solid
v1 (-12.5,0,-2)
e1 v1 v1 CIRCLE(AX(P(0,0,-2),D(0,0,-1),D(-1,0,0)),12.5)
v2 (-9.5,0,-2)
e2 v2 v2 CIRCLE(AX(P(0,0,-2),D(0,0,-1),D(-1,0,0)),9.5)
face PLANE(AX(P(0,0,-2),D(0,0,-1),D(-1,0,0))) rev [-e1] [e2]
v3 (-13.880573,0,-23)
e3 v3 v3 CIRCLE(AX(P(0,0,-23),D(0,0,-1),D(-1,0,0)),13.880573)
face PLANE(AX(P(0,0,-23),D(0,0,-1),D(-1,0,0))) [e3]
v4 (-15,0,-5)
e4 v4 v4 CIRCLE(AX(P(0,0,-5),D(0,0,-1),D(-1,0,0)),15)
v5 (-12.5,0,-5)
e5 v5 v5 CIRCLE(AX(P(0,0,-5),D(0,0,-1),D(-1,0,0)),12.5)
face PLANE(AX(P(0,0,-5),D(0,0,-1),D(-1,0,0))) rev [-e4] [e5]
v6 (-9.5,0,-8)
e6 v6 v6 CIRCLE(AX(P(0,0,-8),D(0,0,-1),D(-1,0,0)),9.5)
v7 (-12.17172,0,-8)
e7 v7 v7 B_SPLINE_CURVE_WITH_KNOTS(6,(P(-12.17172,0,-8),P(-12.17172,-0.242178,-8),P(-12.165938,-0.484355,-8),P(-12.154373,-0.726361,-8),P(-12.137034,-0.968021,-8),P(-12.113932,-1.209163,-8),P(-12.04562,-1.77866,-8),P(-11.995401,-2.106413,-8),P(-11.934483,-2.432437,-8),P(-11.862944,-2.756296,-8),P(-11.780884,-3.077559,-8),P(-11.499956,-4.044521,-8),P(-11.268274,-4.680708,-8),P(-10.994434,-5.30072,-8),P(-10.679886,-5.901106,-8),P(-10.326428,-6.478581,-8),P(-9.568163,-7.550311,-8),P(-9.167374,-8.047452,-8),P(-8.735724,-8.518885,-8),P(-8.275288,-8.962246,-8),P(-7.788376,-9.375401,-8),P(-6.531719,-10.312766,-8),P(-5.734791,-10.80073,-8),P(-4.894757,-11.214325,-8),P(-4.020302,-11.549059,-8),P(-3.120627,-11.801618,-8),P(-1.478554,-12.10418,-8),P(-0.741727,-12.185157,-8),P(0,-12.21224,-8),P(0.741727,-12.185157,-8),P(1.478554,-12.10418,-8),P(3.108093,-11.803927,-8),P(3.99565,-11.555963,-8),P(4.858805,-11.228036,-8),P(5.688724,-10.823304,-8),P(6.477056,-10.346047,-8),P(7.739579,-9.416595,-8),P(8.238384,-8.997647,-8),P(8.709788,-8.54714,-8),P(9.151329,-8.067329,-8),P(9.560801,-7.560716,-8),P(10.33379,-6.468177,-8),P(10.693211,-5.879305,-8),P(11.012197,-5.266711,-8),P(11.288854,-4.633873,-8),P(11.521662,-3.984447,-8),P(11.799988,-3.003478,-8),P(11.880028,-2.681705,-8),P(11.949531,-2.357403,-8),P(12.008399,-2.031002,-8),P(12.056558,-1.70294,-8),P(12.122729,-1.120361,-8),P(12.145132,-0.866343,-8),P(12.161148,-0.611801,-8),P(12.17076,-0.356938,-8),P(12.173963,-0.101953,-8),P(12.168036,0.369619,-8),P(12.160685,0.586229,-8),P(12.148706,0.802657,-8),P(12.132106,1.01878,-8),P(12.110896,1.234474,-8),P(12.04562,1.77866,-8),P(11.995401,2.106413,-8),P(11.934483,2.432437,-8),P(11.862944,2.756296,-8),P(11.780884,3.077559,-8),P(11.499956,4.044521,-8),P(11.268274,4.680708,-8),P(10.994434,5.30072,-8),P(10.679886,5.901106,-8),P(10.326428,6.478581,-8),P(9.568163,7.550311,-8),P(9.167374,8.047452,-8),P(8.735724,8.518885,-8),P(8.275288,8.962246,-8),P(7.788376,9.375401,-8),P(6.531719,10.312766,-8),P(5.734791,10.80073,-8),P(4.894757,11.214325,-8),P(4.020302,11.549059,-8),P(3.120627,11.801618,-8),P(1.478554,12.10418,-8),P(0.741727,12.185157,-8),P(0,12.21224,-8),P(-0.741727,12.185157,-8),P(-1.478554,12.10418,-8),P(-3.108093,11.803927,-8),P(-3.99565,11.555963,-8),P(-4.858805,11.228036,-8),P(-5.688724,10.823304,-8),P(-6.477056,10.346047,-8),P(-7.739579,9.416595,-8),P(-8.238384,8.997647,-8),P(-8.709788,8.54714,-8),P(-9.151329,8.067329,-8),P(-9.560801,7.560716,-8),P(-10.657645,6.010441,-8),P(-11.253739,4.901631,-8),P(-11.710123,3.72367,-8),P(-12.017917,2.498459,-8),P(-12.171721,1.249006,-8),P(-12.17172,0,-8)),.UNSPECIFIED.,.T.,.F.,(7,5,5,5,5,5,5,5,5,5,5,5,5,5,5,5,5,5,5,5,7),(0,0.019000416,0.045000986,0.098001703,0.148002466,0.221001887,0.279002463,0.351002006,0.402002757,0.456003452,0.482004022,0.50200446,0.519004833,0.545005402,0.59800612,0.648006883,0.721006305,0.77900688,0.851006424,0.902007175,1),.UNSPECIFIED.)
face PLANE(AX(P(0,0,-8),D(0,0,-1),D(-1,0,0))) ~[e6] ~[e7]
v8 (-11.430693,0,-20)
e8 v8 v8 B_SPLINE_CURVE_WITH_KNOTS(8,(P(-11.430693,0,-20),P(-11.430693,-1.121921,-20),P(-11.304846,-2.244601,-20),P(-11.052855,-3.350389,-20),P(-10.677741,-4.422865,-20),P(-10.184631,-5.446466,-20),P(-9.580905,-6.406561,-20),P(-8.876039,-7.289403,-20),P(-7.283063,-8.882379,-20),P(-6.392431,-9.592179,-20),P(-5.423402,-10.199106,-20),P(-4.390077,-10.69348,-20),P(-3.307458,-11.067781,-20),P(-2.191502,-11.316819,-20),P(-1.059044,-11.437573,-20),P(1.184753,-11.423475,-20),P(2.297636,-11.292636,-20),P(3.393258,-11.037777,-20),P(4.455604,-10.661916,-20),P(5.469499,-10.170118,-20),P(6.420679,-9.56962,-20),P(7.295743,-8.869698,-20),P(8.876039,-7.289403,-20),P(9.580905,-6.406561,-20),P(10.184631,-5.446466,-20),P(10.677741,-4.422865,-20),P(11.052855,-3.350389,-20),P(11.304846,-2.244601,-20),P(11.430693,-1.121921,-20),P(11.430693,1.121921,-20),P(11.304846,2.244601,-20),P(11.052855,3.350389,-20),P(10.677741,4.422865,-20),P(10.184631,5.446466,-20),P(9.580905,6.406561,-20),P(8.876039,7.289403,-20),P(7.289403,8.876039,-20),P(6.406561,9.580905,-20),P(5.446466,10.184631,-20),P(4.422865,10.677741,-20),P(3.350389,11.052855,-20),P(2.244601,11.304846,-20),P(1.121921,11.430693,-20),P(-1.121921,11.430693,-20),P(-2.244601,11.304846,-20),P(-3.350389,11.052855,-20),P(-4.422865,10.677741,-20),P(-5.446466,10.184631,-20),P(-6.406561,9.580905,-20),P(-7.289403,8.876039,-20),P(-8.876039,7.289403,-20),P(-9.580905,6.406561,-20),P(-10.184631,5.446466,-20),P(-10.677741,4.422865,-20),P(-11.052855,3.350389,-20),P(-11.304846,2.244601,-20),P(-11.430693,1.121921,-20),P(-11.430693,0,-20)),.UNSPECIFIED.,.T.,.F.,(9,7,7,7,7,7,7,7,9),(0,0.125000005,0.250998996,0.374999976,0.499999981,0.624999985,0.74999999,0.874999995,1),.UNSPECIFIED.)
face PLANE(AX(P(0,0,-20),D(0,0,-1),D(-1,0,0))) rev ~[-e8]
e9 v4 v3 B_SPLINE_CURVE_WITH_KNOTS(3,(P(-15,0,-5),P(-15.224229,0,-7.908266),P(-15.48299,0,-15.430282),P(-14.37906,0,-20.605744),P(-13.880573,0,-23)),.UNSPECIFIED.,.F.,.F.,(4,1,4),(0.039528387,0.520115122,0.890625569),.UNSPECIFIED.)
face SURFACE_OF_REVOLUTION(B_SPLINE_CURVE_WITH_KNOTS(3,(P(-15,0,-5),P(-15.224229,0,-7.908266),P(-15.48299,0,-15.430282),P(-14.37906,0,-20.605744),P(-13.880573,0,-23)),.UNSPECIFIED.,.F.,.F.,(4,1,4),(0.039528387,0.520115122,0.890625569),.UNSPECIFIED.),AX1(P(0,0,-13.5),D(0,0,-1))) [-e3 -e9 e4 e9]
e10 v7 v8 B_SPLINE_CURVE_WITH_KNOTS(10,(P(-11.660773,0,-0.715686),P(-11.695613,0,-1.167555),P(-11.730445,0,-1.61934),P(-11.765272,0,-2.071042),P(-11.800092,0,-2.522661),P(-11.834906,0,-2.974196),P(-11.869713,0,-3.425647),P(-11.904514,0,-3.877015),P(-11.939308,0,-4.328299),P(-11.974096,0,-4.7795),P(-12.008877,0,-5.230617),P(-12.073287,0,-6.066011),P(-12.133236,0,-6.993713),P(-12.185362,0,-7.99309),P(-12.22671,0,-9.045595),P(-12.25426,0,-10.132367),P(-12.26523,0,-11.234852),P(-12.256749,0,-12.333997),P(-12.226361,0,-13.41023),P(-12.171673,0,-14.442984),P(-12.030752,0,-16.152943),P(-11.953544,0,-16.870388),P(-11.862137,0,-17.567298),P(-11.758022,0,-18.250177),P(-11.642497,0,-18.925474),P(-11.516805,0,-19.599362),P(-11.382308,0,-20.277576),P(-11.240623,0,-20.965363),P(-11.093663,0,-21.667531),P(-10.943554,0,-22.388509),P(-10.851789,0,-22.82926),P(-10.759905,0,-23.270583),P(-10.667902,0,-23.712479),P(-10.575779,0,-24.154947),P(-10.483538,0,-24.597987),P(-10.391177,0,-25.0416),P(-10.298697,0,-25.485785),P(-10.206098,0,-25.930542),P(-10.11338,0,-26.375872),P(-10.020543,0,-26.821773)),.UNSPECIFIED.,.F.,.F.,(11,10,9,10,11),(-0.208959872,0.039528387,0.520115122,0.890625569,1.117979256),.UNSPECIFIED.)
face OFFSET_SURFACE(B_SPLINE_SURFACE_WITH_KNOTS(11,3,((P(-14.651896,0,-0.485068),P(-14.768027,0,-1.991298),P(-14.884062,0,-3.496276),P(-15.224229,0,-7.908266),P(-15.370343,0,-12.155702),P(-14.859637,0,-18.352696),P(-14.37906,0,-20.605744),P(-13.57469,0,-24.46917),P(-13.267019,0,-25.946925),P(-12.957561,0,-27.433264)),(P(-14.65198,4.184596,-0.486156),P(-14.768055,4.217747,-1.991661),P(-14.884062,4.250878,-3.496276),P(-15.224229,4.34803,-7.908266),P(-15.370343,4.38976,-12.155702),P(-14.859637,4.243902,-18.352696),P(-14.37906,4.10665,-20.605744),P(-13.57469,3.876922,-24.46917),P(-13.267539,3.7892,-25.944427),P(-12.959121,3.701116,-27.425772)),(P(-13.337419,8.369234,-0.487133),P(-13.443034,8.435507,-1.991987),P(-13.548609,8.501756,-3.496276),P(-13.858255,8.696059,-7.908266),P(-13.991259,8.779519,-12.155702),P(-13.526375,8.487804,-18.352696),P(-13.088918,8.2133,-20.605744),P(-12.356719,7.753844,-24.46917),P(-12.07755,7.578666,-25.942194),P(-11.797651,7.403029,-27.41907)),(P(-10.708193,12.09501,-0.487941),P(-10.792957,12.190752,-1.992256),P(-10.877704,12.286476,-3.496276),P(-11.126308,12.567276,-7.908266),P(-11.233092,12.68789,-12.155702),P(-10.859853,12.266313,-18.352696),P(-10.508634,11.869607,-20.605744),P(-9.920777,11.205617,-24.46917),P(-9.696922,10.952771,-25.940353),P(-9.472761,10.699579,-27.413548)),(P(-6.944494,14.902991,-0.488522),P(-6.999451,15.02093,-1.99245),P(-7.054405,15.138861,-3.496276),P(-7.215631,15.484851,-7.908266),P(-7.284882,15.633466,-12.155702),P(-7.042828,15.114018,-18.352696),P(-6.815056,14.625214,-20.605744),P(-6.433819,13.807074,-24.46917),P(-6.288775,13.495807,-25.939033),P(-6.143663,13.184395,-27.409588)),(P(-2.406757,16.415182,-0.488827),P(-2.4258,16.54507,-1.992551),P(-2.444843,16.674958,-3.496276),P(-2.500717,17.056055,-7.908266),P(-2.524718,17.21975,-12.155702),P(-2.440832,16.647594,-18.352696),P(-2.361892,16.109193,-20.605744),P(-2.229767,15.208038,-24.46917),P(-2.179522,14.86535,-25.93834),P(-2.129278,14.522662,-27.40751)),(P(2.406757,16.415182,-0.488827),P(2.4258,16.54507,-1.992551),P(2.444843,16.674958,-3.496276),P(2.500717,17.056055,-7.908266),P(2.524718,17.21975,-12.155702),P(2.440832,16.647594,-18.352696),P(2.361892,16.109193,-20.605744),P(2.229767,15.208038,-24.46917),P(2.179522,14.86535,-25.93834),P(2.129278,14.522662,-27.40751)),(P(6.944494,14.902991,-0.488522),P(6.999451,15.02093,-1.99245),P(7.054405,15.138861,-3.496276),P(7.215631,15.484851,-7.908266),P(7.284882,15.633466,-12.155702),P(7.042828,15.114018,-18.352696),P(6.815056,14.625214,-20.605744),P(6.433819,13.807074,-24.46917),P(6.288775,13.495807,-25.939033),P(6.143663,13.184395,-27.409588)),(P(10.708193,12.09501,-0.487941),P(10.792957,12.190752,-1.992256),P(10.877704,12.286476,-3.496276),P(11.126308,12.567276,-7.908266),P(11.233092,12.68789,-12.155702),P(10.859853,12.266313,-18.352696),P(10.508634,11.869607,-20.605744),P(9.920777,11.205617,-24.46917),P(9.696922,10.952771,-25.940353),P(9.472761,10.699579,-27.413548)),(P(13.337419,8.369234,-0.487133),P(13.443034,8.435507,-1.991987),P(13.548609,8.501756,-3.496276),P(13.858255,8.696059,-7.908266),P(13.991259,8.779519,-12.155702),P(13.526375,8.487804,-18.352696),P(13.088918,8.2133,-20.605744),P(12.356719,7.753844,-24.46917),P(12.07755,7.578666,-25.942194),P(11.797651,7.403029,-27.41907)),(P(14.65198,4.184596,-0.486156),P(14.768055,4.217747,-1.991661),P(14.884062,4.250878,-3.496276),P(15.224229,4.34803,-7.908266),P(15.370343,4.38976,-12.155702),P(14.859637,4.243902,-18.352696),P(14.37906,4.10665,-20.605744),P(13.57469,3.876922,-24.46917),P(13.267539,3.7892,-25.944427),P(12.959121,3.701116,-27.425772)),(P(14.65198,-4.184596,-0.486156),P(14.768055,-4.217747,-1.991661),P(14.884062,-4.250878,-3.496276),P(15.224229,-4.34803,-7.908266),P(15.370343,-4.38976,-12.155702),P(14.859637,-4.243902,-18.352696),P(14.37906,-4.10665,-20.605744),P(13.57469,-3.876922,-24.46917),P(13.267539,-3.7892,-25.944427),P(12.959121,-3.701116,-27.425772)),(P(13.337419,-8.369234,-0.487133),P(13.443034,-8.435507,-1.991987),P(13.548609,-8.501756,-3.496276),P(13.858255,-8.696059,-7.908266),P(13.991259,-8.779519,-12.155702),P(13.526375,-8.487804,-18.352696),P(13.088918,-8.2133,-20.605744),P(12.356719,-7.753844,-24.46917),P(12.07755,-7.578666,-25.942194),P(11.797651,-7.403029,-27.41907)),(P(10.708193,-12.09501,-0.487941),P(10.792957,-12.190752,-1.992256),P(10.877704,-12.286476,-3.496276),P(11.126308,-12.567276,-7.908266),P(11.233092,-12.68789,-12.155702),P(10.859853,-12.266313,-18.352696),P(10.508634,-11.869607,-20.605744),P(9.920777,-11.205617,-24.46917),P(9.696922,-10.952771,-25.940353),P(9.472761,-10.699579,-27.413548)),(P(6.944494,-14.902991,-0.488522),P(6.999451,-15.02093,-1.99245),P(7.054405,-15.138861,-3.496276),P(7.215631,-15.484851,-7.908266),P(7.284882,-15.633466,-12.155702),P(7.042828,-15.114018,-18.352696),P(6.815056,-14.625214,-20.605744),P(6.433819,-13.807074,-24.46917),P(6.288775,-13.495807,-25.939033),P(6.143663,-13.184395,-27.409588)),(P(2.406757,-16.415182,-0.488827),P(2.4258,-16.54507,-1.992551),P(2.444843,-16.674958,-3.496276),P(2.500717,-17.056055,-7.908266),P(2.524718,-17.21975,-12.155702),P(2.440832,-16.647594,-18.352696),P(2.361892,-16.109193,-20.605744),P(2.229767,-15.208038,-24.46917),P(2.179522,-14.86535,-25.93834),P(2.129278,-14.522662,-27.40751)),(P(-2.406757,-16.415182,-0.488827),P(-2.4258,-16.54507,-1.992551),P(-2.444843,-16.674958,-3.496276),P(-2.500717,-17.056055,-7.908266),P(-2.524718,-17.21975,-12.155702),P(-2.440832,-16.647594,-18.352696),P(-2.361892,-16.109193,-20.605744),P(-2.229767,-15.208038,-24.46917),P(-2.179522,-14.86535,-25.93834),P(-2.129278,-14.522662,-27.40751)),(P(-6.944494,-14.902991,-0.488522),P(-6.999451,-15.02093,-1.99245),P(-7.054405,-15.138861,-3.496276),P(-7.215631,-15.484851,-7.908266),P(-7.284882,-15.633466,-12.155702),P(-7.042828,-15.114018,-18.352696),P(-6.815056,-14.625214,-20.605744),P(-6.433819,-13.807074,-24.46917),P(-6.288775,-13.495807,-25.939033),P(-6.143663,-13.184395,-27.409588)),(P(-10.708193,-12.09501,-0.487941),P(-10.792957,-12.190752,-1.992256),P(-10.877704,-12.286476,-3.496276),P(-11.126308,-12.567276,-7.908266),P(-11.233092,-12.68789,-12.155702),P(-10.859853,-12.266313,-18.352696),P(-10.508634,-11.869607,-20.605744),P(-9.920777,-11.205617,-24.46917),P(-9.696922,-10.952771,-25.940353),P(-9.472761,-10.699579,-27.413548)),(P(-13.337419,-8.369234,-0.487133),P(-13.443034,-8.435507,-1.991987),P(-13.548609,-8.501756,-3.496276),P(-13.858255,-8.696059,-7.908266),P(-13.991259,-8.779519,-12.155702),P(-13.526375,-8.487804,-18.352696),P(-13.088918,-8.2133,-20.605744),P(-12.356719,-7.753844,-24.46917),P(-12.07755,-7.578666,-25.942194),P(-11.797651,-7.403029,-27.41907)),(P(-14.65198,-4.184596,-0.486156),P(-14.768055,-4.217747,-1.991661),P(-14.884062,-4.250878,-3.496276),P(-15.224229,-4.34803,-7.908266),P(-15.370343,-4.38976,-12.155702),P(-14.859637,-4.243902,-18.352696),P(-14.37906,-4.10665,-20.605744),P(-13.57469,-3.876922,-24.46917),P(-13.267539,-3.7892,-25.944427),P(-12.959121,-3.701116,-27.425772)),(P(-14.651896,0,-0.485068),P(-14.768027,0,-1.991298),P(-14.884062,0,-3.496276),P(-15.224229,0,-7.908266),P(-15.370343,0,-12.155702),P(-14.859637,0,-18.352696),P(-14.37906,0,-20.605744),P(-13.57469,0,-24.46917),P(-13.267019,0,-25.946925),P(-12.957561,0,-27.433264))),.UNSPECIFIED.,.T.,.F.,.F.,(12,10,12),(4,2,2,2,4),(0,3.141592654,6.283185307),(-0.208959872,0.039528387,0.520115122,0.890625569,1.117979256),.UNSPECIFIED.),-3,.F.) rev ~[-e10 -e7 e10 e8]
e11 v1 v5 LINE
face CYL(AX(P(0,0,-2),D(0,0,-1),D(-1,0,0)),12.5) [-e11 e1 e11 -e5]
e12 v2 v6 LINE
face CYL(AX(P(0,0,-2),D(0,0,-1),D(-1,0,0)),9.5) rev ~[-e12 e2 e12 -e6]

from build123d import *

# Parameters (mm, degrees)
F3_T = -3


# Not quite as in the source:
# - a feature of the source that left no trace in its solid (it failed there, or was rolled back) is left out


with BuildPart() as f2:
    # F1 (on face) → F2 (revolve)
    with BuildSketch(Plane.XZ):
        with BuildLine():
            Line((-12.5, -5), (-15, -5))
            add(Edge.make_bspline(
                [(-15, -5), (-15.2242291382, -7.9082660222), (-15.4829896575, -15.4302819777), (-14.3790599241, -20.605744182), (-13.8805727597, -23)],
                knots=[0.0395283873, 0.0395283873, 0.0395283873, 0.0395283873, 0.5201151217, 0.8906255687, 0.8906255687, 0.8906255687, 0.8906255687], degree=3))
            Line((-13.8805727597, -23), (0, -23))
            Line((0, -23), (0, -2))
            Line((0, -2), (-12.5, -2))
            Line((-12.5, -2), (-12.5, -5))
        make_face()
    revolve(axis=Axis((0, 0, -13.5), (0, 0, -1)))

    # F3
    f3_openings = [f2.faces().sort_by_distance(p)[0] for p in [
        (0, 0, -2),
    ]]
    offset(amount=F3_T, openings=f3_openings, kind=Kind.INTERSECTION)


solid = f2.part
